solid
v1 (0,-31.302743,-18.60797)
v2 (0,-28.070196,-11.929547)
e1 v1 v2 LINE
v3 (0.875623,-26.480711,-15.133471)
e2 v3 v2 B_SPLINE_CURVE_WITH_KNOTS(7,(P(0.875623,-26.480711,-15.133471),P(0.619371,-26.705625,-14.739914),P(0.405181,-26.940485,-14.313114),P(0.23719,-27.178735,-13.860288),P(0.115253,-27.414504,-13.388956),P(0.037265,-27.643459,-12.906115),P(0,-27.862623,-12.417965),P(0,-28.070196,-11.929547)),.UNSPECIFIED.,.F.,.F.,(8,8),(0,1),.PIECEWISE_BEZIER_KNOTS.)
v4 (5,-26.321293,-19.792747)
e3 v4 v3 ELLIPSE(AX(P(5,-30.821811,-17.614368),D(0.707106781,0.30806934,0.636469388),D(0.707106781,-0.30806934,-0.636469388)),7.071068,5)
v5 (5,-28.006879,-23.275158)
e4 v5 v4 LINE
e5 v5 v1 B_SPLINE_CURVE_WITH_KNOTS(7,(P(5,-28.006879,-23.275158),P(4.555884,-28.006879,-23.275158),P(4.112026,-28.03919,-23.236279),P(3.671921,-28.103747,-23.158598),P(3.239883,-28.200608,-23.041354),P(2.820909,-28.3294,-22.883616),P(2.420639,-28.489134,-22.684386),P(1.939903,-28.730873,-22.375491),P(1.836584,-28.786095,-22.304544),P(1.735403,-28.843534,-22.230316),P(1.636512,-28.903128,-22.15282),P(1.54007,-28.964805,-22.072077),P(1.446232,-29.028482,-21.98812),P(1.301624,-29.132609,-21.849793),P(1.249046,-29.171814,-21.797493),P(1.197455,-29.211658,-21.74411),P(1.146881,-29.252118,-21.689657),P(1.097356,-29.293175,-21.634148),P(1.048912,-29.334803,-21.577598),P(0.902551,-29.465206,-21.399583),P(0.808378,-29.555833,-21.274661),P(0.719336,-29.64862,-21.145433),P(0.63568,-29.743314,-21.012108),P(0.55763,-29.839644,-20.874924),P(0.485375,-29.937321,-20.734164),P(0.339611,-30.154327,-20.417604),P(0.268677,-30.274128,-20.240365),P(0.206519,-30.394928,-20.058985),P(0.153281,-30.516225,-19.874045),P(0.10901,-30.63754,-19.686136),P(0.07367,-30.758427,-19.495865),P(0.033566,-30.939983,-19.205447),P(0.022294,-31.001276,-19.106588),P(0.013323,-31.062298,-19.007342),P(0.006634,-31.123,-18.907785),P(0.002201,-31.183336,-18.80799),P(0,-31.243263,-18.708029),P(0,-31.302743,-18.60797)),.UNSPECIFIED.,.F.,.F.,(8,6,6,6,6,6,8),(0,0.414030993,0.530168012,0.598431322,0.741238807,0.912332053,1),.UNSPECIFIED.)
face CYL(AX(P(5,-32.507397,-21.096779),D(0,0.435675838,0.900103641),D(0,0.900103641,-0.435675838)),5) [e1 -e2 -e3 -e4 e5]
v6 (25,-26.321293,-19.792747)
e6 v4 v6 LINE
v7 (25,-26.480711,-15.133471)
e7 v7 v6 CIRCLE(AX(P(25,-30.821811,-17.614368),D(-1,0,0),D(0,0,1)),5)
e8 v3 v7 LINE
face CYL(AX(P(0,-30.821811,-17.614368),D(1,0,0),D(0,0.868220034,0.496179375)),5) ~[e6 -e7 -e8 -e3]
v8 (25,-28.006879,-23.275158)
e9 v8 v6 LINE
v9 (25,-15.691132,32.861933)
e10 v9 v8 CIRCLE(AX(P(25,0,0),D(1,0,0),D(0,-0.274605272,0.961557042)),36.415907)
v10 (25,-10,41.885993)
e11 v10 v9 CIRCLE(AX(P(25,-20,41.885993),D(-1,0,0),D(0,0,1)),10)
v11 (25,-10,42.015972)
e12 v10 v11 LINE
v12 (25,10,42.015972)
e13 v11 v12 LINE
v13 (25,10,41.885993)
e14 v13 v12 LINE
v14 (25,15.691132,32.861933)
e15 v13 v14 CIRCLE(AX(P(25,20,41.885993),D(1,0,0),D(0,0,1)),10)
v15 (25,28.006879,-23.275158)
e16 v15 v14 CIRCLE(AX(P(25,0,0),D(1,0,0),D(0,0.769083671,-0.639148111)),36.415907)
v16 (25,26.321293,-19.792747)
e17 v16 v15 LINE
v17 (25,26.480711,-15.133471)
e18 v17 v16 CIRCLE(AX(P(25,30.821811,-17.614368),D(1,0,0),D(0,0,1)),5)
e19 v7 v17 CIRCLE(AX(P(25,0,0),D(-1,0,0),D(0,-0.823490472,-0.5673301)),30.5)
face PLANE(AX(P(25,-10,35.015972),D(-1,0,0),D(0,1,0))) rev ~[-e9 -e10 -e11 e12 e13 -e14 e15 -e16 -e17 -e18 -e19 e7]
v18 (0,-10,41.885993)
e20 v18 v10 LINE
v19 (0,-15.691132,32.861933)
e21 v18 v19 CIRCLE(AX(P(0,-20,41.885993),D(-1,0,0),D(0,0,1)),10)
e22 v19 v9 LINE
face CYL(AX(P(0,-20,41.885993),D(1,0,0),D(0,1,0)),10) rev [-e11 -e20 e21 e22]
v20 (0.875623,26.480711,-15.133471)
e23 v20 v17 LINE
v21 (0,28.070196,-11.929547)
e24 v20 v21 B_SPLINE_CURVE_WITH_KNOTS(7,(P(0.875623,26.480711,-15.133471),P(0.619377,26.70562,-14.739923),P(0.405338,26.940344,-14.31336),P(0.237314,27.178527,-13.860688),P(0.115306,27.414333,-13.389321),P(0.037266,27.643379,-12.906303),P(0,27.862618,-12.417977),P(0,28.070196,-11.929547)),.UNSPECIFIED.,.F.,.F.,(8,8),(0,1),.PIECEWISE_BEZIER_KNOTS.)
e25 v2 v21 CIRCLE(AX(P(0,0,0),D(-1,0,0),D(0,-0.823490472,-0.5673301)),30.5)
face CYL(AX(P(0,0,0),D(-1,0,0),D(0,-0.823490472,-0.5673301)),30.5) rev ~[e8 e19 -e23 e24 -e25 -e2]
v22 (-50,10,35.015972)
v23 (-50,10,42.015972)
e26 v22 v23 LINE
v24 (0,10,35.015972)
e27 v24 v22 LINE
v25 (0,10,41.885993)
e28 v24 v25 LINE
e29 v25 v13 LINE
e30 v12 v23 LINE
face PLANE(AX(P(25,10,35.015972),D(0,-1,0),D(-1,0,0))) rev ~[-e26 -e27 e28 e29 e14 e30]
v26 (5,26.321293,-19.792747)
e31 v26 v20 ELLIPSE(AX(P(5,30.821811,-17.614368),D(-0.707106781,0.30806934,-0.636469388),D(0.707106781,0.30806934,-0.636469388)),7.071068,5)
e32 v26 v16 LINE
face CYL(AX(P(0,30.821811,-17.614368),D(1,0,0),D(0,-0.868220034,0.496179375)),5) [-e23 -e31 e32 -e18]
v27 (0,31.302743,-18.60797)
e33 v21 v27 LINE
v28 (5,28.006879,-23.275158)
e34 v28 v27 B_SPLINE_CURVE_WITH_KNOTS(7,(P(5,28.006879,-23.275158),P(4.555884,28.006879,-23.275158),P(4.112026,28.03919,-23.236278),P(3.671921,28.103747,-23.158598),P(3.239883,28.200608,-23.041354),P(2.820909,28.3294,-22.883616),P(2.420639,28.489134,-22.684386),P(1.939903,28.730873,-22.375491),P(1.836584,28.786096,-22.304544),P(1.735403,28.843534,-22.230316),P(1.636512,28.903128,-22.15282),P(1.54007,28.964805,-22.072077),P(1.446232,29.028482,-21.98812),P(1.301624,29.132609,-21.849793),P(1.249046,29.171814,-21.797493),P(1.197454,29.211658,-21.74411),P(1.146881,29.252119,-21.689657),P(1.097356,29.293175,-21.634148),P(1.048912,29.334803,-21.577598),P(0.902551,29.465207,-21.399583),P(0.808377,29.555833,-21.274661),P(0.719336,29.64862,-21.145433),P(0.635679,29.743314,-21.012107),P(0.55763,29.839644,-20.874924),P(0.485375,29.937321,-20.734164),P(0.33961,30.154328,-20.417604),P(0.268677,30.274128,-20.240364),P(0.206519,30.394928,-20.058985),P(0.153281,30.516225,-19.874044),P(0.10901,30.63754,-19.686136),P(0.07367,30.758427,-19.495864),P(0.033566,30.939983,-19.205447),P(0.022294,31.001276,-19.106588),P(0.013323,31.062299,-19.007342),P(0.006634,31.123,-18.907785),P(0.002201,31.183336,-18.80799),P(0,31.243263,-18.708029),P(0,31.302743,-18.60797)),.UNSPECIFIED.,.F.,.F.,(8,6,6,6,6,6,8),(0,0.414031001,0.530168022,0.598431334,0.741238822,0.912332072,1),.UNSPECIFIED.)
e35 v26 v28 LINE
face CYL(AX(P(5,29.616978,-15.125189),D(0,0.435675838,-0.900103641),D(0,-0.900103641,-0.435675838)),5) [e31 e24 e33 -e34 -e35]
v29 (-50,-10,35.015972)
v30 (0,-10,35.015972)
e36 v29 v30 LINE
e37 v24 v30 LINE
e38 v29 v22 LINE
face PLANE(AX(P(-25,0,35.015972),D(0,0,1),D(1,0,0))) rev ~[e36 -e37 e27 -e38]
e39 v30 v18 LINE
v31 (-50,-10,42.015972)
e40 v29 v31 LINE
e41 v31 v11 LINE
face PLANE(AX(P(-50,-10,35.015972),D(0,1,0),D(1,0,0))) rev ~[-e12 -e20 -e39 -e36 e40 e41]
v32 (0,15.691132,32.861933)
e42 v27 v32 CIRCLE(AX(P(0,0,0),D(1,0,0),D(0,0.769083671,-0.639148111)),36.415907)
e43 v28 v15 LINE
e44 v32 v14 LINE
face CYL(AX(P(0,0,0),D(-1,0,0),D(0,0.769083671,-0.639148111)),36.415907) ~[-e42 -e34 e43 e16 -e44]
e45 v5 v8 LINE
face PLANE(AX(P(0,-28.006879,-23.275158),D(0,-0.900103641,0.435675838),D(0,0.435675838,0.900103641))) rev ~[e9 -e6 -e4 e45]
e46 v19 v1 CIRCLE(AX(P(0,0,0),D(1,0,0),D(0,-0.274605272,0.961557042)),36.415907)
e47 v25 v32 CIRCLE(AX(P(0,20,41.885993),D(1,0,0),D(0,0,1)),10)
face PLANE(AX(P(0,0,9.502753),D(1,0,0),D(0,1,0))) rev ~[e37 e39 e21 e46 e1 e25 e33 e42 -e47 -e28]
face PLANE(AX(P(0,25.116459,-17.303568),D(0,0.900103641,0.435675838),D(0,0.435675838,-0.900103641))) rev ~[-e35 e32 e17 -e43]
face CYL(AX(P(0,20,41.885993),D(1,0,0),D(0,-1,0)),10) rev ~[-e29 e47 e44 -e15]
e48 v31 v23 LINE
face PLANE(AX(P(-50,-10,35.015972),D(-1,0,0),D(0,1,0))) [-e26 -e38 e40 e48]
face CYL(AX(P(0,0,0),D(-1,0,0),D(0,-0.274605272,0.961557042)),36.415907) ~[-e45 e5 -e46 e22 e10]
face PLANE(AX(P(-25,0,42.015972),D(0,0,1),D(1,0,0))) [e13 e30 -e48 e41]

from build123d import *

# Parameters (mm, degrees)
F1_DEPTH = 25
F2_W     = 75
F2_H     = 15
F2_W_2   = 25
F3_DEPTH = 7
F4_R     = 5
F6_W     = 50
F6_H     = 20
F6_W_2   = 25
F7_DEPTH = 7
F8_R     = 10


with BuildPart() as f1:
    # F0 (on Right) → F1 (new body)
    with BuildSketch(Plane.YZ):
        with BuildLine():
            ThreePointArc((-25.1164593902, -17.3035680626), (0, 30.5), (25.1164593902, -17.3035680626))
            Line((25.1164593902, -17.3035680626), (28.0068792885, -23.275158049))
            ThreePointArc((28.0068792885, -23.275158049), (34.7936009681, 10.7481906084), (10, 35.015971637))
            Line((10, 35.015971637), (-10, 35.015971637))
            ThreePointArc((-10, 35.015971637), (-34.7936009681, 10.7481906084), (-28.0068792885, -23.275158049))
            Line((-28.0068792885, -23.275158049), (-25.1164593902, -17.3035680626))
        make_face()
    extrude(amount=F1_DEPTH)

    # F4
    f4_edges = [f1.edges().sort_by_distance(p)[0] for p in [
        (0, -26.561669, -20.289363),
        (12.5, 25.116459, -17.303568),
        (12.5, -25.116459, -17.303568),
        (0, 26.561669, -20.289363),
    ]]
    fillet(f4_edges, radius=F4_R)

    # F6 (on face) → F7 (join)
    with BuildSketch(Plane.XY.offset(35.015971637)):
        with Locations((-25, 0)):
            Rectangle(F6_W, F6_H)
        with Locations((12.5, 0)):
            Rectangle(F6_W_2, F6_H)
    extrude(amount=F7_DEPTH)

    # F8
    f8_edges = [f1.edges().sort_by_distance(p)[0] for p in [
        (12.5, -10, 35.015972),
        (12.5, 10, 35.015972),
    ]]
    fillet(f8_edges, radius=F8_R)


with BuildPart() as f3:
    # F2 (on face) → F3 (new body)
    with BuildSketch(Plane.XY.offset(35.015971637)):
        with Locations((-37.5, 0)):
            Rectangle(F2_W, F2_H)
        with Locations((12.5, 0)):
            Rectangle(F2_W_2, F2_H)
    extrude(amount=F3_DEPTH)


solid = f1.part
